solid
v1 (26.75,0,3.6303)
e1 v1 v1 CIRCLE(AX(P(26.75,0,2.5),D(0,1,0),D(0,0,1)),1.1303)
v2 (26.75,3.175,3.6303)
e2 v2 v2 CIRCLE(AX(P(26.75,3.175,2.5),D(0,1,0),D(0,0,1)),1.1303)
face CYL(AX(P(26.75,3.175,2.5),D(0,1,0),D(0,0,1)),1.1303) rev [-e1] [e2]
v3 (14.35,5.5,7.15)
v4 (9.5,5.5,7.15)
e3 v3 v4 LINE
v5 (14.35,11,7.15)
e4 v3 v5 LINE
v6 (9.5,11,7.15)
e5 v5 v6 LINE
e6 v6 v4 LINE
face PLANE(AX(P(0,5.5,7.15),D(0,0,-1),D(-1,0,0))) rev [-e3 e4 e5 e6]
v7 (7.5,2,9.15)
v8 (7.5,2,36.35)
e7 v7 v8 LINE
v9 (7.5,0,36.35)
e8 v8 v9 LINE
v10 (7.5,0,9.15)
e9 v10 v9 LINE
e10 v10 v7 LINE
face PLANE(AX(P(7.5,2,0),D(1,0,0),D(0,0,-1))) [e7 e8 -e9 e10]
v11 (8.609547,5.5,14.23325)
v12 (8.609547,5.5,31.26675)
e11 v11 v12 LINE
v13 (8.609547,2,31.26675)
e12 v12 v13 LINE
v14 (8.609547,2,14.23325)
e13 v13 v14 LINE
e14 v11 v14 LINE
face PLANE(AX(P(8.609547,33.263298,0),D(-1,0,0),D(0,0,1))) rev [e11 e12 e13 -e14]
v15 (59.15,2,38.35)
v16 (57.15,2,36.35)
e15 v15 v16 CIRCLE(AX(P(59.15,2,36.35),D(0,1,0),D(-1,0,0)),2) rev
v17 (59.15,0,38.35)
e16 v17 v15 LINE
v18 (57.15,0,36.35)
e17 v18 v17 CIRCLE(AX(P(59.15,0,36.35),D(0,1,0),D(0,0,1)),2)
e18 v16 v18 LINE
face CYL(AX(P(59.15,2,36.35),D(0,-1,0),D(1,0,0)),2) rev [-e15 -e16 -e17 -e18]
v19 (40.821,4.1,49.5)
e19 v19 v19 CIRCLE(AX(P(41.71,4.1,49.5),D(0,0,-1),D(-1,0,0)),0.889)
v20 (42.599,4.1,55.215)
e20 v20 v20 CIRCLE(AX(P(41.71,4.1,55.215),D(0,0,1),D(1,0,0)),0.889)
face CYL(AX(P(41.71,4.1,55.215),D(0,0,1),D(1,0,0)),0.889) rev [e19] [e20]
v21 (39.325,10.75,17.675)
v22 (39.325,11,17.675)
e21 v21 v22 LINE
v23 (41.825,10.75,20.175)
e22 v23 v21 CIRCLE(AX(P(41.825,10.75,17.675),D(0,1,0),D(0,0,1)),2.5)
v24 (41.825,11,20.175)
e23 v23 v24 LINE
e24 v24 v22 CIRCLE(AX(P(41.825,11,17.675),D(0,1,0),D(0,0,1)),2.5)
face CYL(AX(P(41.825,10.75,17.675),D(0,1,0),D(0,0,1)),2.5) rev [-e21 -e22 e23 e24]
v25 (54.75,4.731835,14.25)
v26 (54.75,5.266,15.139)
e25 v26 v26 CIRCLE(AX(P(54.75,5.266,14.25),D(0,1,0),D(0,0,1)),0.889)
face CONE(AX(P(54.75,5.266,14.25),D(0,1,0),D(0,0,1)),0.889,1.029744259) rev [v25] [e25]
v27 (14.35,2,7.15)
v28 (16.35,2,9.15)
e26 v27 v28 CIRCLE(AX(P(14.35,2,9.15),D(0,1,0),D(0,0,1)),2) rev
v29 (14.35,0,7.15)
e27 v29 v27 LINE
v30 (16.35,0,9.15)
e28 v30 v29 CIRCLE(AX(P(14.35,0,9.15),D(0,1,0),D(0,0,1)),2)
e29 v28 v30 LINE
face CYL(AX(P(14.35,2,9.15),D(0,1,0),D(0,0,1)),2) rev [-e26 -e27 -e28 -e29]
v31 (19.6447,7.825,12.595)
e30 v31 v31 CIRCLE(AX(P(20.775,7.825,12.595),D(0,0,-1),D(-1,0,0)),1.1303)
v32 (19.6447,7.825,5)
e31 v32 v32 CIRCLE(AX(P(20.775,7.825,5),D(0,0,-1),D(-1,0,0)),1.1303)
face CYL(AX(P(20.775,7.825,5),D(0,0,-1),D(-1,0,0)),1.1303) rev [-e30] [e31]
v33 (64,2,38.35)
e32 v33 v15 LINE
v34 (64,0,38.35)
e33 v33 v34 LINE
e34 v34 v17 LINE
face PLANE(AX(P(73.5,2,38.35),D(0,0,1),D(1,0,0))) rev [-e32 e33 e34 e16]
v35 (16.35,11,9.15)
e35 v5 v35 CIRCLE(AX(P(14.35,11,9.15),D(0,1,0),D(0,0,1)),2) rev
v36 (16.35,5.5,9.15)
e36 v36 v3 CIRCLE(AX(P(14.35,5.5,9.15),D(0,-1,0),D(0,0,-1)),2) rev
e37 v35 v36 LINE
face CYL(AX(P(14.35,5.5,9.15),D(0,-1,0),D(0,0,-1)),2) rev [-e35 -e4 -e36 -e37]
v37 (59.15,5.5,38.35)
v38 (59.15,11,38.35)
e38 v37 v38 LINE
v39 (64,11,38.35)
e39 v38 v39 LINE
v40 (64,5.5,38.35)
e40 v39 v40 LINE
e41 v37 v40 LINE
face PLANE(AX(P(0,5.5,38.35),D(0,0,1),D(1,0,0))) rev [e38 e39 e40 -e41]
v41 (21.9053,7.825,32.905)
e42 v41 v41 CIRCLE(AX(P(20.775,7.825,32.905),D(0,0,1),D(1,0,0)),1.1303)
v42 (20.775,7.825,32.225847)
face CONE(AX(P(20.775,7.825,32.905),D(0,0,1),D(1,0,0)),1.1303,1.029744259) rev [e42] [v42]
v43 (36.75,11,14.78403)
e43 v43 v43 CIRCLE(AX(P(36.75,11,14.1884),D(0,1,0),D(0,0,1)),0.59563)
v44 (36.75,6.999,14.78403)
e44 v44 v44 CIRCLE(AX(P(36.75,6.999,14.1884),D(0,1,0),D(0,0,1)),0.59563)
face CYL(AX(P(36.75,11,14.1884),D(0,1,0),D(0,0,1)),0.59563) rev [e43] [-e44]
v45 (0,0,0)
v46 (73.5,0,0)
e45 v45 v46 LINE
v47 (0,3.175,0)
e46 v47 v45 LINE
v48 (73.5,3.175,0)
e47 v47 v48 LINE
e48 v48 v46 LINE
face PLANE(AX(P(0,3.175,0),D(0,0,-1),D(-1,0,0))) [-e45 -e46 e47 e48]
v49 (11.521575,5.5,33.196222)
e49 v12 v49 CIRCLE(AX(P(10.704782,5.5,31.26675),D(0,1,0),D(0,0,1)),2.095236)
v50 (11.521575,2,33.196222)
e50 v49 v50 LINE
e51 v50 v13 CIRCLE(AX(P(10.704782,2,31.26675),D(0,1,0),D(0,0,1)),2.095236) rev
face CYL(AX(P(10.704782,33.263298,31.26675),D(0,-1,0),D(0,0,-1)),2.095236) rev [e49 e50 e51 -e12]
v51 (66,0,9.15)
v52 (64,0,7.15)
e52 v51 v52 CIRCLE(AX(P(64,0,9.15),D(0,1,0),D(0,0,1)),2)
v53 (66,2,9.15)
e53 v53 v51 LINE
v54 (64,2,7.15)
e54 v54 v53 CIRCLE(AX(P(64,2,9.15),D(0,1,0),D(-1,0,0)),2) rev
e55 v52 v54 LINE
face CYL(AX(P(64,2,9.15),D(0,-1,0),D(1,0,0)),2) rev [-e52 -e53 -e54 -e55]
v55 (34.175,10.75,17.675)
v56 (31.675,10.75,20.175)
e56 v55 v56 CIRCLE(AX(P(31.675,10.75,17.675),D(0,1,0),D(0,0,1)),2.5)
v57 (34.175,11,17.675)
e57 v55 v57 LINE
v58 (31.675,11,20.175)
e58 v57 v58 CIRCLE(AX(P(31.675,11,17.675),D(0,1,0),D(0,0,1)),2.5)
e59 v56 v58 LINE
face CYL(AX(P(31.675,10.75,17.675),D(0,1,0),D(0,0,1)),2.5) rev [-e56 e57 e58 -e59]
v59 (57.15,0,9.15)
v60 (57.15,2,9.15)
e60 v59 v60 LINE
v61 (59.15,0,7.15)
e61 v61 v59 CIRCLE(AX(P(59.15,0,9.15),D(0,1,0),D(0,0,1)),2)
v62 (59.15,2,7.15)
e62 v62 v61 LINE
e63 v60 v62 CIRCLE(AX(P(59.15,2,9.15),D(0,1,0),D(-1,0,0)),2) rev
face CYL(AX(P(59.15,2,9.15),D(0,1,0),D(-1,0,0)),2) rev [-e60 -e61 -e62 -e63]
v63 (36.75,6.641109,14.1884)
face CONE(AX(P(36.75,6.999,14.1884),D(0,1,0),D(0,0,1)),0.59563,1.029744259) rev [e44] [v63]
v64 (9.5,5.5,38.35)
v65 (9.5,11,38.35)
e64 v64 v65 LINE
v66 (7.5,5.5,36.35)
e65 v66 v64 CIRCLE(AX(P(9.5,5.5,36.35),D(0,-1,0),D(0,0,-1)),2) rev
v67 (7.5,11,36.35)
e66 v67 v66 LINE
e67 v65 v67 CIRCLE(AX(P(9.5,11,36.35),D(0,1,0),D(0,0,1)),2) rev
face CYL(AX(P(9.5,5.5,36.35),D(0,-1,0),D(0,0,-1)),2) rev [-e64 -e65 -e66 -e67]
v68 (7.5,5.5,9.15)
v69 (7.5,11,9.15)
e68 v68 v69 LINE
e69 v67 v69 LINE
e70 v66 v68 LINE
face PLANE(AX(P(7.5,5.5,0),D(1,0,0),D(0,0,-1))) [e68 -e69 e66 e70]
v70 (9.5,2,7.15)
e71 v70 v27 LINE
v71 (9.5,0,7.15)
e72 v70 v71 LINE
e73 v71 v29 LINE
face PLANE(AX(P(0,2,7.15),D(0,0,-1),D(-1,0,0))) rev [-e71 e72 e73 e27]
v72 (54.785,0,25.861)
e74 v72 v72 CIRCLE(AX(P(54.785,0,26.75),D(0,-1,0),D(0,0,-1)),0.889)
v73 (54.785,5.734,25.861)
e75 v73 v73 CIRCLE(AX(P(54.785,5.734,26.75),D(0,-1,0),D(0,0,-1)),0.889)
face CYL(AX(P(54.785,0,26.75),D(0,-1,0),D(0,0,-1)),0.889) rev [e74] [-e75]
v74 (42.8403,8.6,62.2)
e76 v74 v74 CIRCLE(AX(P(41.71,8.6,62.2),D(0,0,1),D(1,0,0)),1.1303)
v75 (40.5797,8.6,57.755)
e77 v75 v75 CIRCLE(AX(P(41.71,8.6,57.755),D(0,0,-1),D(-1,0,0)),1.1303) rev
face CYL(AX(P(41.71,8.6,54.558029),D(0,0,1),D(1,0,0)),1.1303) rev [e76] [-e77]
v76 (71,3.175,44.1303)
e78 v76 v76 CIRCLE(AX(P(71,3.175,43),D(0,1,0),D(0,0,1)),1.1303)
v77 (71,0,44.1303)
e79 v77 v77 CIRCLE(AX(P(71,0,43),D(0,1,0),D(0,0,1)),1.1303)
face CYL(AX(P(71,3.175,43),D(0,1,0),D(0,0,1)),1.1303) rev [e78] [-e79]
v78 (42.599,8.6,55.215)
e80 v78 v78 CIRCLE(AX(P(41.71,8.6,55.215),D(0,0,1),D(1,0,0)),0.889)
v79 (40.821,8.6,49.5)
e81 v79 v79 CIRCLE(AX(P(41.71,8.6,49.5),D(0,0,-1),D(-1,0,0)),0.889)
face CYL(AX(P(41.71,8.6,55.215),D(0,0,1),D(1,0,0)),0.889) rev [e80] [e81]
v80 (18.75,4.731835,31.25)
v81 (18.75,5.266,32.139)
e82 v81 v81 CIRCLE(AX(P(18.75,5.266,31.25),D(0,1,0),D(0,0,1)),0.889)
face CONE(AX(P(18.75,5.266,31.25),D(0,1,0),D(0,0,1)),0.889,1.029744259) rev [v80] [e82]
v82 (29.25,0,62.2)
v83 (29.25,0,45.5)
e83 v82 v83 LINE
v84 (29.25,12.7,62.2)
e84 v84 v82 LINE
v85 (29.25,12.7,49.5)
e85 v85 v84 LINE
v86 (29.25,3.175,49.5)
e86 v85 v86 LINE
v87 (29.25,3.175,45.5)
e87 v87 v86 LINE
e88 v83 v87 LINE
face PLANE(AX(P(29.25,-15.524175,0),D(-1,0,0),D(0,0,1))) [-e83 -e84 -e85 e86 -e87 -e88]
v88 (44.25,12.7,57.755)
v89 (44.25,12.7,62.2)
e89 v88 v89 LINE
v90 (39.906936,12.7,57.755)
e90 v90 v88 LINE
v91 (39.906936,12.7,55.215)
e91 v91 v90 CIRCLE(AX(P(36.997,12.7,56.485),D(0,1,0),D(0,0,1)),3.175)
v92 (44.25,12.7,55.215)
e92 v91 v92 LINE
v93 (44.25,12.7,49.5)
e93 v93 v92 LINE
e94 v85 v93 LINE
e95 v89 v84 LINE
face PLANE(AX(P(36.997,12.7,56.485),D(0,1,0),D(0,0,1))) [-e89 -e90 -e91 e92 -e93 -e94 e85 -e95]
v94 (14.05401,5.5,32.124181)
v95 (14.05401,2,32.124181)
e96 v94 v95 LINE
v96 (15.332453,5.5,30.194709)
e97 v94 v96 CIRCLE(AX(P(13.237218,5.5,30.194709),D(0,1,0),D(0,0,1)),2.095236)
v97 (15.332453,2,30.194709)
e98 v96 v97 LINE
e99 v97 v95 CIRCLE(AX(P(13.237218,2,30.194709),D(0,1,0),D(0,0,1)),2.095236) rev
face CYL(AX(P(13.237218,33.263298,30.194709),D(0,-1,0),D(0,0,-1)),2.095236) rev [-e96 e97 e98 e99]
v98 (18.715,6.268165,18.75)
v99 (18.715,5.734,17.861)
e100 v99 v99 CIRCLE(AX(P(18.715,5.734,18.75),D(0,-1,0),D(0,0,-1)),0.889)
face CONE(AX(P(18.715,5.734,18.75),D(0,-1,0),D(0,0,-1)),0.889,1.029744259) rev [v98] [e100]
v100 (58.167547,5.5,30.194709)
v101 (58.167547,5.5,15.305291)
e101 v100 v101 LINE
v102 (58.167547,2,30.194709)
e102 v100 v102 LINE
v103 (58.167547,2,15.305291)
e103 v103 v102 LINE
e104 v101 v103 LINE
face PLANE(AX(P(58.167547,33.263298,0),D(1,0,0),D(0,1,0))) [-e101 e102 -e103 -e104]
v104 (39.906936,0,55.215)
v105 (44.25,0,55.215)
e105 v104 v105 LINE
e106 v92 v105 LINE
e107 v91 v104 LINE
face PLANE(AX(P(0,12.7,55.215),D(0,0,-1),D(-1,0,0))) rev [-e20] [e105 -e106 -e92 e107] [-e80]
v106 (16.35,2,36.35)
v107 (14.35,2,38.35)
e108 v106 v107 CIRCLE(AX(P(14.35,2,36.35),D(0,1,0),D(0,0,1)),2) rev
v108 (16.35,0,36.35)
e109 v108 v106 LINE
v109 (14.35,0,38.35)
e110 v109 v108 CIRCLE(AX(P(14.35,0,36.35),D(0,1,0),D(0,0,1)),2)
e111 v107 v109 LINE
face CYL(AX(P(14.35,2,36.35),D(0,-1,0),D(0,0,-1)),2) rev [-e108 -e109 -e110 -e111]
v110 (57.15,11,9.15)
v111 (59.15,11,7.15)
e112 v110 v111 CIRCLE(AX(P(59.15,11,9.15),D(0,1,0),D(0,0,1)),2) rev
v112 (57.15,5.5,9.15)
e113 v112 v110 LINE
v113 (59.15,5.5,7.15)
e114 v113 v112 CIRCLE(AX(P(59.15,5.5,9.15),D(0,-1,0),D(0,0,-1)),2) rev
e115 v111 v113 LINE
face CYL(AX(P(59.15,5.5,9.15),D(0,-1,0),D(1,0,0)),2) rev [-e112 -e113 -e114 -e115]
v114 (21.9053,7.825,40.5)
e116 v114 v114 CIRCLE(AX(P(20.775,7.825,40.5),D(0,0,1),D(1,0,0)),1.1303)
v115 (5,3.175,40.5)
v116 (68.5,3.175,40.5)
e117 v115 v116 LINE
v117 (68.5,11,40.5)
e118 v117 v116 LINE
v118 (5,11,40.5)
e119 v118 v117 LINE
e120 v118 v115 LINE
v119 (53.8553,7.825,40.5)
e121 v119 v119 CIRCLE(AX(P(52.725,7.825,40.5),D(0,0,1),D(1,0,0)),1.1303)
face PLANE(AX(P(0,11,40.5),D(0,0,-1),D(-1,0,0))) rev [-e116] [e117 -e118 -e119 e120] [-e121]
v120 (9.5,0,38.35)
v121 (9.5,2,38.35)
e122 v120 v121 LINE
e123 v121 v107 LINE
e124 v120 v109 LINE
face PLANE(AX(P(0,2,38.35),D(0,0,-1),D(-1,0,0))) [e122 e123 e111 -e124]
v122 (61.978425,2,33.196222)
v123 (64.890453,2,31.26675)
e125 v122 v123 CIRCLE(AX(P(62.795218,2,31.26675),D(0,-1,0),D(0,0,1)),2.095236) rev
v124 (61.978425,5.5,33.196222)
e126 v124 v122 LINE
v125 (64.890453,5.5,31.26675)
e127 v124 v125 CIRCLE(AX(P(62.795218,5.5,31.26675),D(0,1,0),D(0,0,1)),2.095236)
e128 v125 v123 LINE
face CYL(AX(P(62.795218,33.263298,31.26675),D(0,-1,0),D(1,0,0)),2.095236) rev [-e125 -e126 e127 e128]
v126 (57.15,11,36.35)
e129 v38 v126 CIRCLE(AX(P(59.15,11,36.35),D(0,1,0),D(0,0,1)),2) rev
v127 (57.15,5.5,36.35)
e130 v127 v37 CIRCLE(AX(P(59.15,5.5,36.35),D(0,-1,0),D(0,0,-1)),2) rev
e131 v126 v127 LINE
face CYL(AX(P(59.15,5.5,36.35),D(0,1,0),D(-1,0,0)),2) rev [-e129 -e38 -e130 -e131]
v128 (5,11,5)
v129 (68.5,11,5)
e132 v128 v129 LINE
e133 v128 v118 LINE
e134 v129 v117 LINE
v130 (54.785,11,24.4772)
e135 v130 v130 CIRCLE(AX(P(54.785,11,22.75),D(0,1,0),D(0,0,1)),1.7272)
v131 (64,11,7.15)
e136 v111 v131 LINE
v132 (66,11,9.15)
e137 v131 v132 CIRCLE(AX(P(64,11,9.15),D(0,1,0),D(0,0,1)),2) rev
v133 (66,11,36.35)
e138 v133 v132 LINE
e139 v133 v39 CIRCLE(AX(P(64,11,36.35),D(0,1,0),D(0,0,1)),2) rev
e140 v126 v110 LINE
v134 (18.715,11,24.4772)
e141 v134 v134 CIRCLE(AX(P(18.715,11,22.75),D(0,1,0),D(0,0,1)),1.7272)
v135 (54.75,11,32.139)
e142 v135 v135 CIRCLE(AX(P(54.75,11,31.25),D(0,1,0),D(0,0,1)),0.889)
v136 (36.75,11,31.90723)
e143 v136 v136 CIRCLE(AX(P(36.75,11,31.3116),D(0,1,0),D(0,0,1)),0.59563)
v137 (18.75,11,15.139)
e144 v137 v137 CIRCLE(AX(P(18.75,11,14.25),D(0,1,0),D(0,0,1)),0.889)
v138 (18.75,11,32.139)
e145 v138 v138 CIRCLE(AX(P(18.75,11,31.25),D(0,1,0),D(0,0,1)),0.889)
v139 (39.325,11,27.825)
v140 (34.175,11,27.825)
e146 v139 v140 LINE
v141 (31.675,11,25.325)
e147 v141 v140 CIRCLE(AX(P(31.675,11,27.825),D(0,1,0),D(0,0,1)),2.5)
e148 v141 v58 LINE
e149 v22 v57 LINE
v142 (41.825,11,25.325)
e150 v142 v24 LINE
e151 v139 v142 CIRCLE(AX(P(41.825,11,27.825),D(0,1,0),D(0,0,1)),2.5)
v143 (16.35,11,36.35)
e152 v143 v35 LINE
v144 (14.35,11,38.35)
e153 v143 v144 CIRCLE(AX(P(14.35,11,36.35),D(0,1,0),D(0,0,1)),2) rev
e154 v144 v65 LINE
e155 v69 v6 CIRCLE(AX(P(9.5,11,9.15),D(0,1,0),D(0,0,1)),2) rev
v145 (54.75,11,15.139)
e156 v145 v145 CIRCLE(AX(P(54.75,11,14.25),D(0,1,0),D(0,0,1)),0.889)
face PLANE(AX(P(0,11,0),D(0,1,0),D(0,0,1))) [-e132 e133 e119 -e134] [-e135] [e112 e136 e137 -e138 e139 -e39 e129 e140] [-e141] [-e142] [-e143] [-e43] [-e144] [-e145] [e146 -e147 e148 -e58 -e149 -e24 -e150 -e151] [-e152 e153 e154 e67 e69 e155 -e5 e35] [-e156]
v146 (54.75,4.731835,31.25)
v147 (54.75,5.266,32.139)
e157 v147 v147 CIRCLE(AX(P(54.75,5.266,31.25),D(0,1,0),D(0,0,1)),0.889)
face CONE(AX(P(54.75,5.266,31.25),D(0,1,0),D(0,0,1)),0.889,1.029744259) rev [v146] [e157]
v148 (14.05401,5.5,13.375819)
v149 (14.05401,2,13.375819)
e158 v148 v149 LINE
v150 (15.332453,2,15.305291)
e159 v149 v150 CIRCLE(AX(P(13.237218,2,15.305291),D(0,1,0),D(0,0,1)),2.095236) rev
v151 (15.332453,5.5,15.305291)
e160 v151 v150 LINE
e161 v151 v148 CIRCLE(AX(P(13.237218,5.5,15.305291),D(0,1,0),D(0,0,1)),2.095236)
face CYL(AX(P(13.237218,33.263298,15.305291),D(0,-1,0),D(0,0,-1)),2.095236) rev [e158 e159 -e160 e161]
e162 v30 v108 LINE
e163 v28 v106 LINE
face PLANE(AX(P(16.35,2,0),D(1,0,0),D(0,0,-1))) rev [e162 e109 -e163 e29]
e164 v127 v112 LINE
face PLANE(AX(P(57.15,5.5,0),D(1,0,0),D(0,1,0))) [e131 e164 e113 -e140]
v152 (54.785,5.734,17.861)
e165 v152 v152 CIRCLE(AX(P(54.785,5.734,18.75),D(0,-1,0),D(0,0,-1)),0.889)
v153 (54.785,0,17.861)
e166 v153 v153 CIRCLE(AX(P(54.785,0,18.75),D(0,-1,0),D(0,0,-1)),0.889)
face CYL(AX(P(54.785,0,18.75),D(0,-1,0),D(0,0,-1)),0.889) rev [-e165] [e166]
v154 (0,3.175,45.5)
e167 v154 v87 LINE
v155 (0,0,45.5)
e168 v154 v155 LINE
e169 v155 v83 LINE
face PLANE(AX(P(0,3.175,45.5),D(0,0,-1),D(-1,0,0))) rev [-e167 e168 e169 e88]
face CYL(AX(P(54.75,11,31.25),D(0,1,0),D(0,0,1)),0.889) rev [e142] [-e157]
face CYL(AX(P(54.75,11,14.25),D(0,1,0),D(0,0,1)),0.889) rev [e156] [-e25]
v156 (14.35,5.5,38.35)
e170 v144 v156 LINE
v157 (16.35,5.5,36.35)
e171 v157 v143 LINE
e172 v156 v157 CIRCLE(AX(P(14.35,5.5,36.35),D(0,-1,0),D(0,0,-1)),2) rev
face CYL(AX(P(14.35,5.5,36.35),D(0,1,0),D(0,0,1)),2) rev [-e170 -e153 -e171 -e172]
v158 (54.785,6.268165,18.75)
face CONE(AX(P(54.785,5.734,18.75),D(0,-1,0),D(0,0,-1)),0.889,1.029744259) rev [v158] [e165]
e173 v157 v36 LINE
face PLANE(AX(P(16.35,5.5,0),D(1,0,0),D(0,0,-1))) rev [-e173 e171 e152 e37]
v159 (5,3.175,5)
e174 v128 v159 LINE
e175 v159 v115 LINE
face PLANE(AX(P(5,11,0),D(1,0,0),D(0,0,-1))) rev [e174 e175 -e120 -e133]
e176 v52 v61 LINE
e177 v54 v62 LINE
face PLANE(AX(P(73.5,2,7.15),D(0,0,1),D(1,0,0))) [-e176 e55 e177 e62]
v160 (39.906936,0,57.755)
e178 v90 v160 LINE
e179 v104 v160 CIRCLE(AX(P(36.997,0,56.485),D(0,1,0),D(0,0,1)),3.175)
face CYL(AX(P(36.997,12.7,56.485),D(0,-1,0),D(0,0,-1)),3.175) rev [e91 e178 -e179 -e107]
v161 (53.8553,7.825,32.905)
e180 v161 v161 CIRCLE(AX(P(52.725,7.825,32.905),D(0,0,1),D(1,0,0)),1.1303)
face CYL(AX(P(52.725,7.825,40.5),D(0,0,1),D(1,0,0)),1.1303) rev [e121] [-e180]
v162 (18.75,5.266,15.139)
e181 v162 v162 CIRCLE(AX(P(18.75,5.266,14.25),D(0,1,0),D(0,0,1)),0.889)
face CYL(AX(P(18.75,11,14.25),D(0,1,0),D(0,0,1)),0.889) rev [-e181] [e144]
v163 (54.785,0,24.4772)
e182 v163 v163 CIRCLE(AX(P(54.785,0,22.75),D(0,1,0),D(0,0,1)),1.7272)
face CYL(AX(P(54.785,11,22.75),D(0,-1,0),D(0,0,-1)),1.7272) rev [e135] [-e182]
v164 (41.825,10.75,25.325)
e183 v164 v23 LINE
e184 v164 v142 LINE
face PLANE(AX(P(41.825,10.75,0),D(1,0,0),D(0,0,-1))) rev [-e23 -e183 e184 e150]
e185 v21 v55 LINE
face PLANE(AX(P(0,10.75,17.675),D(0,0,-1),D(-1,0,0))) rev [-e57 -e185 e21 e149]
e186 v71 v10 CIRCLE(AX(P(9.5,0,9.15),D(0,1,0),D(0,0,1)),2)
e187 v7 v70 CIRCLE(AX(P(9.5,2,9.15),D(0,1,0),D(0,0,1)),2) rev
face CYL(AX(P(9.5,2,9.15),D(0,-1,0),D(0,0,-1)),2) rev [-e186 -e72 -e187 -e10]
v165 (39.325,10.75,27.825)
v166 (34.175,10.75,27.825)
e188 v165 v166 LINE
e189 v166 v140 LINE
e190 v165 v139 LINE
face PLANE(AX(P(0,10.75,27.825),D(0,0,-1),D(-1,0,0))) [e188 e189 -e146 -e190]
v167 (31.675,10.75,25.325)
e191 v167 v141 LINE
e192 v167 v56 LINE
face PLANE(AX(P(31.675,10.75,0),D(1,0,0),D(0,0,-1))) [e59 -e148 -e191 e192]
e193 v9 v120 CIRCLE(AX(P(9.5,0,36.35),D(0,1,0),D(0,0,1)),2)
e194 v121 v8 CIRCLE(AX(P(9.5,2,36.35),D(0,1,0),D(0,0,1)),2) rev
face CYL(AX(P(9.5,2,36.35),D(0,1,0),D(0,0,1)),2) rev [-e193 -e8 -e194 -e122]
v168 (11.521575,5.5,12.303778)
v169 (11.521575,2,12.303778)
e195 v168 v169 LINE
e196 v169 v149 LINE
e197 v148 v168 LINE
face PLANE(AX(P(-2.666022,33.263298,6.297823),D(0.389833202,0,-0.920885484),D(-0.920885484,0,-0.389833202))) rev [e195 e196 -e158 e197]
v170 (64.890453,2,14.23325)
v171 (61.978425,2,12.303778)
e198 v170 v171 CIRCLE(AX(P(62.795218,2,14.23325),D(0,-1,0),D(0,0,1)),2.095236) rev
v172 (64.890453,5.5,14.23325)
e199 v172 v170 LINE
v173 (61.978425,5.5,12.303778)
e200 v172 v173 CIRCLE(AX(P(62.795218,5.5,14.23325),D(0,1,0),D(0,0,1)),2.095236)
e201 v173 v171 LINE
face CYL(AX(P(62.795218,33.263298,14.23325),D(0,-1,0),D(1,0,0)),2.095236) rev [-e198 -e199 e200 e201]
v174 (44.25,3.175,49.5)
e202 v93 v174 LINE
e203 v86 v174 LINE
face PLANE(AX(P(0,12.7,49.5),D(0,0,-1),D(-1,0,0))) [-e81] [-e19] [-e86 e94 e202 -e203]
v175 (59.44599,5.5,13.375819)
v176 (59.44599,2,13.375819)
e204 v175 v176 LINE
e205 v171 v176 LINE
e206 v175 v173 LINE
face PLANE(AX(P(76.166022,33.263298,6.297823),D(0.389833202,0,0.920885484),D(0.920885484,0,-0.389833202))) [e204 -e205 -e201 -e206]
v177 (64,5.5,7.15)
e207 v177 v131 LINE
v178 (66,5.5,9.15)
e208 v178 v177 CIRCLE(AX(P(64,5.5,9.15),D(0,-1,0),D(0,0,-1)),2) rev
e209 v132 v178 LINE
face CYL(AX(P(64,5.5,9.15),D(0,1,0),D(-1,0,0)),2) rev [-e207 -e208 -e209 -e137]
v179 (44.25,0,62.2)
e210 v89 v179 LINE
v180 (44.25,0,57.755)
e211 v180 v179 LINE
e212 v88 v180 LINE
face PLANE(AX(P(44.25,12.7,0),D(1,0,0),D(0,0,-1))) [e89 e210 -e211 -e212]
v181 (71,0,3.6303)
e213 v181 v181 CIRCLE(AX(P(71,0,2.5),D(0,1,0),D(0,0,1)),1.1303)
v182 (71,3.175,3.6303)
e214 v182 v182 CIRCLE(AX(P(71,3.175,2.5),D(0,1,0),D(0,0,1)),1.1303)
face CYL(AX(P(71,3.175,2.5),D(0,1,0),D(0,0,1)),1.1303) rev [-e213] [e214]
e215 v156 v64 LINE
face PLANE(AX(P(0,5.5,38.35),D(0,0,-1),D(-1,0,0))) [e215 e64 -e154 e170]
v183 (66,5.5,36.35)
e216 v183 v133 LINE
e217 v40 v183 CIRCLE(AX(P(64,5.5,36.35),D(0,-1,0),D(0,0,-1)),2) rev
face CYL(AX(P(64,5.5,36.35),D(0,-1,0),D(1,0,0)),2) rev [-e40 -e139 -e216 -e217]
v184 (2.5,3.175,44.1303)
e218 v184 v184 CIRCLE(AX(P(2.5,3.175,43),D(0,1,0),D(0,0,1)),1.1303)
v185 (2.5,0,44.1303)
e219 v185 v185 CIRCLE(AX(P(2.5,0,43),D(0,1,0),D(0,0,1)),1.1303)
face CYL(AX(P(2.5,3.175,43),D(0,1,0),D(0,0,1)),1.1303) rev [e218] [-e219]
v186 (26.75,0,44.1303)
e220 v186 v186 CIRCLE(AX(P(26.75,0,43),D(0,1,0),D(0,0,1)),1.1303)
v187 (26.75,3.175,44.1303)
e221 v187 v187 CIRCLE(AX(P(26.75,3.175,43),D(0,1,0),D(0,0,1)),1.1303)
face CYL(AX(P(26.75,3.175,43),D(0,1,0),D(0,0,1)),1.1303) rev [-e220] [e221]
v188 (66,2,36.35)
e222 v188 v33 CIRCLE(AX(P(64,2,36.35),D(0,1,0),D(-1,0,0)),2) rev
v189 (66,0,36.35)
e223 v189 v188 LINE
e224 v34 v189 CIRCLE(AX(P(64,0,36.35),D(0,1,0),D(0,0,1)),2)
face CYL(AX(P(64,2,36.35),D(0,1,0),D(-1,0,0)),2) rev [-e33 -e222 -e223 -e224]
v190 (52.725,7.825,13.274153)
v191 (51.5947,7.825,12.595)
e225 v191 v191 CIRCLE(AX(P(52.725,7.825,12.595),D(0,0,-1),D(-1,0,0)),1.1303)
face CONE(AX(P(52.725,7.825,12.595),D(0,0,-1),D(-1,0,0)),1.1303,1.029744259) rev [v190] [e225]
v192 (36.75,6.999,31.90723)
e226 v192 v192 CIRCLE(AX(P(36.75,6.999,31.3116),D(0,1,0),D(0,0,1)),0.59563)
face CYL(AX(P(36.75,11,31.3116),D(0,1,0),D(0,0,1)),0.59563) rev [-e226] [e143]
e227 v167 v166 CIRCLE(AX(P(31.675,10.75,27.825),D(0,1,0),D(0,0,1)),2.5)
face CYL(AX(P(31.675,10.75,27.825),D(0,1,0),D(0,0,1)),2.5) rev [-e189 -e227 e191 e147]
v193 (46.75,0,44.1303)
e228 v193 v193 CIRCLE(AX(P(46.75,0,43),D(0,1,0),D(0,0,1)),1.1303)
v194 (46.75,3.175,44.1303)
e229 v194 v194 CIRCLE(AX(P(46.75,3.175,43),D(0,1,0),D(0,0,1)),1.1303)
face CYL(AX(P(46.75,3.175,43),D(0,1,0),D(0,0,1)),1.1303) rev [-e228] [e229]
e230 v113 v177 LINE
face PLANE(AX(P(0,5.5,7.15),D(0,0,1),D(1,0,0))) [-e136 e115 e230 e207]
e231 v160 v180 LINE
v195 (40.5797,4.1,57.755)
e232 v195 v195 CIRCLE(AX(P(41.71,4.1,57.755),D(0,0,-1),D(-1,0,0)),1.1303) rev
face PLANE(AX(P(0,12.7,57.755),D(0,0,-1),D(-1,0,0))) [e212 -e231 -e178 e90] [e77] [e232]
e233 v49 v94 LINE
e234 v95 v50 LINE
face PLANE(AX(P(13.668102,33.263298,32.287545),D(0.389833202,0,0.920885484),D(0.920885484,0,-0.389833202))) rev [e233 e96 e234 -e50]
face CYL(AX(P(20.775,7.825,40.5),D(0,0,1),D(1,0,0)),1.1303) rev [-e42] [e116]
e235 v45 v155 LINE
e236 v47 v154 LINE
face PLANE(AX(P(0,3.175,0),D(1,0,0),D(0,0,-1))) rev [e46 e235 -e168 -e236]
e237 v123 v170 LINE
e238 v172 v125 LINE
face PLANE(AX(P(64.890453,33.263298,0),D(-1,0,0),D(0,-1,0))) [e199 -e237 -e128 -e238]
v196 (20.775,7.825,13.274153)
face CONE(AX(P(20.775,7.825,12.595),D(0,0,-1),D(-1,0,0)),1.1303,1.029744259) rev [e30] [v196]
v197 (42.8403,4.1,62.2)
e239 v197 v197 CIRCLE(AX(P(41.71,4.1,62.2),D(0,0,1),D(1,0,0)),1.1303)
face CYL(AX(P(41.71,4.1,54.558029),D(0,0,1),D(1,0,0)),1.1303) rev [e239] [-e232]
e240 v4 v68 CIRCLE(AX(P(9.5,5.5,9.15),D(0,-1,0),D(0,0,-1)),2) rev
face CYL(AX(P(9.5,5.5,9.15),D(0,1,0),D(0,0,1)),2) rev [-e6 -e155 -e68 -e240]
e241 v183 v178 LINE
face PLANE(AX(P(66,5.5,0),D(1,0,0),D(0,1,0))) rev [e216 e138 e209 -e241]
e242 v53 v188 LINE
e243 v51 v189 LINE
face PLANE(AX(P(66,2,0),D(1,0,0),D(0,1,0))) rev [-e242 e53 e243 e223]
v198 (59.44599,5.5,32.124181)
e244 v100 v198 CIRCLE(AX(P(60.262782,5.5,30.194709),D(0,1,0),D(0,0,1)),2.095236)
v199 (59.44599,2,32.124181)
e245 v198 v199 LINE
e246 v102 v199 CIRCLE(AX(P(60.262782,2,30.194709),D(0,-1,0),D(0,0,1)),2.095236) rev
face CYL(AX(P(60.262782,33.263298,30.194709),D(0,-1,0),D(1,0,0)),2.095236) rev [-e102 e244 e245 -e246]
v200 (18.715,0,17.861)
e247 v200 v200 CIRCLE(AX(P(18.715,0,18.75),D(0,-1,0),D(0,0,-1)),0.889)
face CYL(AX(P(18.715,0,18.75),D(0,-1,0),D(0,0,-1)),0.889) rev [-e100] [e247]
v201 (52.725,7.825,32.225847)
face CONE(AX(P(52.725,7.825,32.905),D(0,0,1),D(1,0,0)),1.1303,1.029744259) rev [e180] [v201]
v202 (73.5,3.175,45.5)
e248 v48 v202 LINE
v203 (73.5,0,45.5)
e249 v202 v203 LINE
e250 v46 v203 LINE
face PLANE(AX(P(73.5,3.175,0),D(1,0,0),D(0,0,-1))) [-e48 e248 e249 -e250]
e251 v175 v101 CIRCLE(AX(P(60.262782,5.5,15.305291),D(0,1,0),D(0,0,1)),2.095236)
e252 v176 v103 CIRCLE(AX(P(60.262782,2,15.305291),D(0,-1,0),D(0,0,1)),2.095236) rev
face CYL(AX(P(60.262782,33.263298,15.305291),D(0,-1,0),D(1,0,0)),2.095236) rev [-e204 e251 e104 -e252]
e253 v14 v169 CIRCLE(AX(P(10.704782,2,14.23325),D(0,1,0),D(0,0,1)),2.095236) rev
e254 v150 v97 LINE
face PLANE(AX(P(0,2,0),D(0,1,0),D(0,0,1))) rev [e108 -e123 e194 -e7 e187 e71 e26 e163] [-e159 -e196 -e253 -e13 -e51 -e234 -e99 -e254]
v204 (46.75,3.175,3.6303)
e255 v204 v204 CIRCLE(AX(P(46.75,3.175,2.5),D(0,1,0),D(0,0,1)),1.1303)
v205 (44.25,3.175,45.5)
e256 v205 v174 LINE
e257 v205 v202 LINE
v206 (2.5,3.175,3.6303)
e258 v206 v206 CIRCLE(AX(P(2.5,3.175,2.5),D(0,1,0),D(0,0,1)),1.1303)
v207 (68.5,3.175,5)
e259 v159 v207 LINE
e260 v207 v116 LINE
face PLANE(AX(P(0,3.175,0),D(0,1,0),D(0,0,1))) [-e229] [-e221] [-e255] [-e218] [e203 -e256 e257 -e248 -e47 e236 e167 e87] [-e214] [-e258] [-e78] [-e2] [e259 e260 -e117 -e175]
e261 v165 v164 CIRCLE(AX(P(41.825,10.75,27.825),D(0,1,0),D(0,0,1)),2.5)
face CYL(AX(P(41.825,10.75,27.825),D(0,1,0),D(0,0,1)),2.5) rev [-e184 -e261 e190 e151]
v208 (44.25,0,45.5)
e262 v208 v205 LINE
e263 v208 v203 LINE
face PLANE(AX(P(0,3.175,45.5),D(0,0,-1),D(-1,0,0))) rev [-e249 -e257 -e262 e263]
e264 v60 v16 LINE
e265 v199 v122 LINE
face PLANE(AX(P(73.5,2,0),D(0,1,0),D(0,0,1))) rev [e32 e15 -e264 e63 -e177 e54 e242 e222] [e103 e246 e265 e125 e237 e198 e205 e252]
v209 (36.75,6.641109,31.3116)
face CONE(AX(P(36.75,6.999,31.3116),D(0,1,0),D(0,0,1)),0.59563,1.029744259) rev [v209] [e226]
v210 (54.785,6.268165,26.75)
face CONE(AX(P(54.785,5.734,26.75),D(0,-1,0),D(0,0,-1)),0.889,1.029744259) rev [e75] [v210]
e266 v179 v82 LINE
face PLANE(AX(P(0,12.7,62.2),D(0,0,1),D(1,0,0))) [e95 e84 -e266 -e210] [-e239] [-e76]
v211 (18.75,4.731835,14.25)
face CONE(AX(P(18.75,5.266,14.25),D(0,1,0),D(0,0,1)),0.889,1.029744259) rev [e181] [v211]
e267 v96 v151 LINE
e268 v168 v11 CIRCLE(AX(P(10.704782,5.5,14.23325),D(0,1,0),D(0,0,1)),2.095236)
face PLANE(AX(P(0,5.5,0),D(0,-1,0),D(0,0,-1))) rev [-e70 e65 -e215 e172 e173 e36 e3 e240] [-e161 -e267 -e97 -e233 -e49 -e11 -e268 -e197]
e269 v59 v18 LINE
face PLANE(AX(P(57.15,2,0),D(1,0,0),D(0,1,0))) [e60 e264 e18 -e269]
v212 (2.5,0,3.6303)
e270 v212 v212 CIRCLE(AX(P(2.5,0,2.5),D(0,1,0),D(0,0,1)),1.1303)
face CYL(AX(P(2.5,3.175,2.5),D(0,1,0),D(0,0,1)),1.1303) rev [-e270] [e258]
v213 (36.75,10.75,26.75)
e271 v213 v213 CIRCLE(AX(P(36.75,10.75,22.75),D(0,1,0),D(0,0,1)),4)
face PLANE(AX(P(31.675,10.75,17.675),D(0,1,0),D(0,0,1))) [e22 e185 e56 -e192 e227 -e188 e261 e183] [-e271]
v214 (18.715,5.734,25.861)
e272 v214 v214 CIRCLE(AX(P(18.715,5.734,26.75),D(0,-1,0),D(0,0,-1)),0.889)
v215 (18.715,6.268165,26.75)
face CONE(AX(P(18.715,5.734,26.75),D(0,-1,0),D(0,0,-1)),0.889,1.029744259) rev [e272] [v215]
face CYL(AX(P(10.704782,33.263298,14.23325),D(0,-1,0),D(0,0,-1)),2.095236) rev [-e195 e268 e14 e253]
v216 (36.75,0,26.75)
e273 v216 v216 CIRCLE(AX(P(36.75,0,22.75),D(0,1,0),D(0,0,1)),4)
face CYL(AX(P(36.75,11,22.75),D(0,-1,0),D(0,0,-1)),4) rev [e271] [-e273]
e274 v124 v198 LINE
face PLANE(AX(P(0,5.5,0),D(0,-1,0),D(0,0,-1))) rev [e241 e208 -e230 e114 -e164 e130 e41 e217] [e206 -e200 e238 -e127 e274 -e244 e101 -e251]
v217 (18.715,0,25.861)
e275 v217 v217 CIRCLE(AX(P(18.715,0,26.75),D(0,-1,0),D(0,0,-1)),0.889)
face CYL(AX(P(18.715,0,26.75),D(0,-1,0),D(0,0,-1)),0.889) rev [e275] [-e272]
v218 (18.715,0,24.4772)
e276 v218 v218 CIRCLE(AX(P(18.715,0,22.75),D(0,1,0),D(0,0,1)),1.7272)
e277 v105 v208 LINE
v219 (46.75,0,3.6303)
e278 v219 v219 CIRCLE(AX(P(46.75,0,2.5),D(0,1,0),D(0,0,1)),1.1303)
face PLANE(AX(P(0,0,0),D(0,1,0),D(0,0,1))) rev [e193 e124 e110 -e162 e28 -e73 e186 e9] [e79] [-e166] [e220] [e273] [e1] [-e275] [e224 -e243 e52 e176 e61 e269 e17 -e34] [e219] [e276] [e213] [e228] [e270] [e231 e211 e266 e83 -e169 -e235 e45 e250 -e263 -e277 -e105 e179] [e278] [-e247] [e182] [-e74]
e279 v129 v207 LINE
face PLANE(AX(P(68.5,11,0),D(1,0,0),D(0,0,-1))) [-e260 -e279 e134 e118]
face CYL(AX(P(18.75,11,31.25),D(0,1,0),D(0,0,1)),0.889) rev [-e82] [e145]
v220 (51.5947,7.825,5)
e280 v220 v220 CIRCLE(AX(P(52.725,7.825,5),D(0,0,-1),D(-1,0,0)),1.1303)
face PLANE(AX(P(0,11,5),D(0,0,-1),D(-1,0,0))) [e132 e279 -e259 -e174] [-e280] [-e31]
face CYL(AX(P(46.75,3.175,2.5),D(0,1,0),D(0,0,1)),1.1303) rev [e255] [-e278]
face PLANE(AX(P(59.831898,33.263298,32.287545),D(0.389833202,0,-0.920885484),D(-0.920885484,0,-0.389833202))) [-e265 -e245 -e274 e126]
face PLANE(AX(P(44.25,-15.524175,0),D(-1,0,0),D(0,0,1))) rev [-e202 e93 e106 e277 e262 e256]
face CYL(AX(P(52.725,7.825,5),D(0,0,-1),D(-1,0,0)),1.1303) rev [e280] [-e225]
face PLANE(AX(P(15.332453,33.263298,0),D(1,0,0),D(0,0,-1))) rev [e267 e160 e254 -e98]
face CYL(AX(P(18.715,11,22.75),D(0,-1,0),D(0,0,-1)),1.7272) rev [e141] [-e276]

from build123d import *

# Parameters (mm, degrees)
MAIN_SKETCH_W                           = 73.5
MAIN_SKETCH_H                           = 45.5
MAIN_SKETCH_W_2                         = 63.5
MAIN_SKETCH_H_2                         = 35.5
LIP_DEPTH                               = 3.175
MOUNTING_BASE_OUTLINE_W                 = 63.5
MOUNTING_BASE_OUTLINE_H                 = 35.5
MOUNTING_BASE_OUTLINE_R                 = 1.7272
MOUNTING_BASE_OUTLINE_R_2               = 4
MOUNTING_BASE_DEPTH                     = 11
HEATER_CART_4_40_TAPS_D                 = 2.2606
HEATER_CART_4_40_TAPS_DEPTH             = 7.595
HEATER_CART_4_40_TAPS_TIP               = 0.679152758
HEATER_CART_4_40_TAPS_ON_FACE_2_D       = 2.2606
HEATER_CART_4_40_TAPS_ON_FACE_2_DEPTH   = 7.595
HEATER_CART_4_40_TAPS_ON_FACE_2_TIP     = 0.679152758
MAIN_SKETCH_12_W                        = 8.85
MAIN_SKETCH_12_H                        = 31.2
BOTTOM_SQUARE_CUTOUT_DEPTH              = 2
SQUARE_MICRO_D_CUTOUT_START             = 5.5
SQUARE_MICRO_D_CUTOUT_OUTLINE_W         = 8.85
SQUARE_MICRO_D_CUTOUT_OUTLINE_H         = 31.2
SQUARE_MICRO_D_CUTOUT_DEPTH             = 5.5
MAIN_SKETCH_7_R                         = 0.285
ROUND_MICRO_D_CUTOUT_DEPTH              = 11
INTERNAL_CORNER_CUTOUTS_FILLET_R        = 2
CHIP_CLAMP_0_80_TAPS_AT_2_COUNT         = 2
CHIP_CLAMP_0_80_TAPS_AT_2_PITCH         = 17.1232
CHIP_CLAMP_0_80_TAPS_AT_3_COUNT         = 2
CHIP_CLAMP_0_80_TAPS_AT_3_PITCH         = 17.1232
CHIP_POCKET_START                       = 11
MAIN_SKETCH_6_R                         = 2.5
MAIN_SKETCH_6_W                         = 10.15
MAIN_SKETCH_6_H                         = 10.15
CHIP_POCKET_DEPTH                       = 0.25
F_2_56_CLOSE_CLEAR_43_0_089_D           = 2.2606
F_2_56_CLOSE_CLEAR_43_0_089_ON_FACE_2_D = 2.2606
PCB_2_56_TAPS_D                         = 1.778
PCB_2_56_TAPS_DEPTH                     = 5.734
PCB_2_56_TAPS_TIP                       = 0.53416509
BOTTOM_COVER_2_56_TAPS_D                = 1.778
BOTTOM_COVER_2_56_TAPS_DEPTH            = 5.734
BOTTOM_COVER_2_56_TAPS_TIP              = 0.53416509
C_CLAMP_SKETCH_W                        = 15
C_CLAMP_SKETCH_H                        = 4
CCLAMP_BRIDGE_DEPTH                     = 3.175
C_CLAMP_START                           = -3.175
C_CLAMP_DEPTH                           = 12.7
C_CLAMP_HOLE_LOCS_R                     = 1.1303
F_2_56_CLSOE_FIT_THRU_DEPTH             = 4.445
F_2_56_TAPPED_HOLE2_D                   = 1.778
F_2_56_TAPPED_HOLE2_DEPTH               = 14.715


# Read off the part's stored shape, not the designer's step: Mounting_Base, Square_Micro_D_Cutout
with BuildPart() as part:
    # Main_Sketch → Lip (new body)
    with BuildSketch(Plane(origin=(0, 0, 0), x_dir=(1, 0, 0), z_dir=(0, 1, 0))):
        with Locations((36.75, -22.75)):
            Rectangle(MAIN_SKETCH_W, MAIN_SKETCH_H)
        with Locations((36.75, -22.75)):
            Rectangle(MAIN_SKETCH_W_2, MAIN_SKETCH_H_2, mode=Mode.SUBTRACT)
    extrude(amount=LIP_DEPTH)

    # Mounting_Base outline → Mounting_Base (add)
    with BuildSketch(Plane(origin=(0, 0, 0), x_dir=(1, 0, 0), z_dir=(0, 1, 0))):
        with Locations((36.75, -22.75)):
            Rectangle(MOUNTING_BASE_OUTLINE_W, MOUNTING_BASE_OUTLINE_H)
        with Locations((18.715, -22.75)):
            Circle(MOUNTING_BASE_OUTLINE_R, mode=Mode.SUBTRACT)
        with Locations((36.75, -22.75)):
            Circle(MOUNTING_BASE_OUTLINE_R_2, mode=Mode.SUBTRACT)
        with Locations((54.785, -22.75)):
            Circle(MOUNTING_BASE_OUTLINE_R, mode=Mode.SUBTRACT)
    extrude(amount=MOUNTING_BASE_DEPTH)

    # Heater_Cart_#4-40_Taps
    with Locations(Plane(origin=(52.725, 7.825, 5), x_dir=(-1, 0, 0), z_dir=(0, 0, -1))):
        with Locations((0, 0), (31.95, 0)):
            Hole(HEATER_CART_4_40_TAPS_D / 2, depth=HEATER_CART_4_40_TAPS_DEPTH)
            with Locations((0, 0, -(HEATER_CART_4_40_TAPS_DEPTH + HEATER_CART_4_40_TAPS_TIP / 2))):  # 118° drill point
                Cone(0, HEATER_CART_4_40_TAPS_D / 2, HEATER_CART_4_40_TAPS_TIP, mode=Mode.SUBTRACT)

    # Heater_Cart_#4-40_Taps on face 2
    with Locations(Plane(origin=(20.775, 7.825, 40.5), x_dir=(1, 0, 0), z_dir=(0, 0, 1))):
        with Locations((0, 0), (31.95, 0)):
            Hole(HEATER_CART_4_40_TAPS_ON_FACE_2_D / 2, depth=HEATER_CART_4_40_TAPS_ON_FACE_2_DEPTH)
            with Locations((0, 0, -(HEATER_CART_4_40_TAPS_ON_FACE_2_DEPTH + HEATER_CART_4_40_TAPS_ON_FACE_2_TIP / 2))):  # 118° drill point
                Cone(0, HEATER_CART_4_40_TAPS_ON_FACE_2_D / 2, HEATER_CART_4_40_TAPS_ON_FACE_2_TIP, mode=Mode.SUBTRACT)

    # Main_Sketch<12> → Bottom_square_cutout (cut)
    with BuildSketch(Plane(origin=(0, 0, 0), x_dir=(1, 0, 0), z_dir=(0, 1, 0))):
        with Locations((11.925, -22.75)):
            Rectangle(MAIN_SKETCH_12_W, MAIN_SKETCH_12_H)
        with BuildLine():
            ThreePointArc((11.521574965, -33.196222286), (10.496212222, -33.351578951), (9.521946869, -32.996175702))
            ThreePointArc((9.521946869, -32.996175702), (8.851632057, -32.244424217), (8.609546604, -31.26675))
            Line((8.609546604, -31.26675), (8.609546604, -14.23325))
            ThreePointArc((8.609546604, -14.23325), (8.851632057, -13.255575783), (9.521946869, -12.503824298))
            ThreePointArc((9.521946869, -12.503824298), (10.496212222, -12.148421049), (11.521574965, -12.303777714))
            Line((11.521574965, -12.303777714), (14.054010046, -13.37581902))
            ThreePointArc((14.054010046, -13.37581902), (14.983840891, -14.148001292), (15.3324534, -15.305291306))
            Line((15.3324534, -15.305291306), (15.3324534, -30.194708694))
            ThreePointArc((15.3324534, -30.194708694), (14.983840891, -31.351998708), (14.054010046, -32.12418098))
            Line((14.054010046, -32.12418098), (11.521574965, -33.196222286))
        make_face(mode=Mode.SUBTRACT)
    bottom_square_cutout = extrude(amount=BOTTOM_SQUARE_CUTOUT_DEPTH, mode=Mode.SUBTRACT)

    # Square_Micro_D_Cutout outline → Square_Micro_D_Cutout (cut)
    with BuildSketch(Plane(origin=(0, 0, 0), x_dir=(1, 0, 0), z_dir=(0, 1, 0)).offset(SQUARE_MICRO_D_CUTOUT_START)):
        with Locations((11.925, -22.75)):
            Rectangle(SQUARE_MICRO_D_CUTOUT_OUTLINE_W, SQUARE_MICRO_D_CUTOUT_OUTLINE_H)
        with BuildLine():
            ThreePointArc((11.521574965, -33.196222286), (9.547492447, -33.013373348), (8.609546604, -31.26675))
            Line((8.609546604, -31.26675), (8.609546604, -14.23325))
            ThreePointArc((8.609546604, -14.23325), (9.547492447, -12.486626652), (11.521574965, -12.303777714))
            Line((11.521574965, -12.303777714), (14.054010046, -13.37581902))
            ThreePointArc((14.054010046, -13.37581902), (14.983840891, -14.148001291), (15.3324534, -15.305291306))
            Line((15.3324534, -15.305291306), (15.3324534, -30.194708694))
            ThreePointArc((15.3324534, -30.194708694), (14.983840891, -31.351998709), (14.054010046, -32.12418098))
            Line((14.054010046, -32.12418098), (11.521574965, -33.196222286))
        make_face(mode=Mode.SUBTRACT)
    square_micro_d_cutout = extrude(amount=SQUARE_MICRO_D_CUTOUT_DEPTH, mode=Mode.SUBTRACT)

    # Main_Sketch<7> → Round_Micro_D_Cutout (cut)
    # profile 1 of 2: a face of its own
    with BuildSketch(Plane(origin=(0, 0, 0), x_dir=(1, 0, 0), z_dir=(0, 1, 0))):
        with BuildLine():
            ThreePointArc((9.521946869, -32.996175702), (8.851632057, -32.244424217), (8.609546604, -31.26675))
            Line((8.609546604, -31.26675), (8.609546604, -14.23325))
            ThreePointArc((8.609546604, -14.23325), (8.851632057, -13.255575783), (9.521946869, -12.503824298))
            ThreePointArc((9.521946869, -12.503824298), (10.496212222, -12.148421049), (11.521574965, -12.303777714))
            Line((11.521574965, -12.303777714), (14.054010046, -13.37581902))
            ThreePointArc((14.054010046, -13.37581902), (14.983840891, -14.148001292), (15.3324534, -15.305291306))
            Line((15.3324534, -15.305291306), (15.3324534, -30.194708694))
            ThreePointArc((15.3324534, -30.194708694), (14.983840891, -31.351998708), (14.054010046, -32.12418098))
            Line((14.054010046, -32.12418098), (11.521574965, -33.196222286))
            ThreePointArc((11.521574965, -33.196222286), (10.496212222, -33.351578951), (9.521946869, -32.996175702))
        make_face()
        with Locations((11.399546604, -22.75)):
            Circle(MAIN_SKETCH_7_R, mode=Mode.SUBTRACT)
    # profile 2 of 2: a face of its own
    with BuildSketch(Plane(origin=(0, 0, 0), x_dir=(1, 0, 0), z_dir=(0, 1, 0))):
        with Locations((11.399546604, -22.75)):
            Circle(MAIN_SKETCH_7_R)
    round_micro_d_cutout = extrude(amount=ROUND_MICRO_D_CUTOUT_DEPTH, mode=Mode.SUBTRACT)

    # MicroD_Mirror: Bottom_square_cutout, Square_Micro_D_Cutout, Round_Micro_D_Cutout across plane
    add(bottom_square_cutout.mirror(Plane(origin=(36.75, 0, 0), x_dir=(0, 0, 1), z_dir=(1, 0, 0))), mode=Mode.SUBTRACT)
    add(square_micro_d_cutout.mirror(Plane(origin=(36.75, 0, 0), x_dir=(0, 0, 1), z_dir=(1, 0, 0))), mode=Mode.SUBTRACT)
    add(round_micro_d_cutout.mirror(Plane(origin=(36.75, 0, 0), x_dir=(0, 0, 1), z_dir=(1, 0, 0))), mode=Mode.SUBTRACT)

    # Internal_Corner_cutouts_fillet
    internal_corner_cutouts_fillet_edges = [part.edges().sort_by_distance(p)[0] for p in [
        (16.35, 8.25, 38.35),
        (7.5, 8.25, 38.35),
        (7.5, 8.25, 7.15),
        (16.35, 8.25, 7.15),
        (57.15, 1, 7.15),
        (57.15, 1, 38.35),
        (66, 1, 38.35),
        (66, 1, 7.15),
        (66, 8.25, 7.15),
        (66, 8.25, 38.35),
        (57.15, 8.25, 38.35),
        (57.15, 8.25, 7.15),
        (16.35, 1, 38.35),
        (16.35, 1, 7.15),
        (7.5, 1, 7.15),
        (7.5, 1, 38.35),
    ]]
    fillet(internal_corner_cutouts_fillet_edges, radius=INTERNAL_CORNER_CUTOUTS_FILLET_R)

    # Sketch3 → Chip_Clamp_#0-80 Taps (revolve, cut)
    with BuildSketch(Plane(origin=(36.75, 11, 31.3116), x_dir=(0, 0, 1), z_dir=(1, 0, 0))):
        Polygon((0, 0), (0, 4.358890611), (0.59563, 4.001), (0.59563, 0), align=None)
    chip_clamp_0_80_taps = revolve(axis=Axis((36.75, 17.35, 31.3116), (0, -1, 0)), mode=Mode.SUBTRACT)

    # Chip_Clamp_#0-80 Taps at 2: Chip_Clamp_#0-80 Taps ×2
    with Locations(*[(0, 0, -i * CHIP_CLAMP_0_80_TAPS_AT_2_PITCH) for i in range(1, CHIP_CLAMP_0_80_TAPS_AT_2_COUNT)]):
        add(chip_clamp_0_80_taps, mode=Mode.SUBTRACT)

    # Chip_Clamp_#0-80 Taps at 3: Chip_Clamp_#0-80 Taps ×2
    with Locations(*[(0, 0, -i * CHIP_CLAMP_0_80_TAPS_AT_3_PITCH) for i in range(1, CHIP_CLAMP_0_80_TAPS_AT_3_COUNT)]):
        add(chip_clamp_0_80_taps, mode=Mode.SUBTRACT)

    # Main_Sketch<6> → Chip_Pocket (cut)
    with BuildSketch(Plane(origin=(0, 0, 0), x_dir=(1, 0, 0), z_dir=(0, 1, 0)).offset(CHIP_POCKET_START)):
        with BuildLine():
            Line((31.675, -20.175), (31.675, -17.675))
            Line((31.675, -17.675), (34.175, -17.675))
            ThreePointArc((34.175, -17.675), (29.907233047, -15.907233047), (31.675, -20.175))
        make_face()
        with BuildLine():
            Line((34.175, -17.675), (31.675, -17.675))
            Line((31.675, -17.675), (31.675, -20.175))
            ThreePointArc((31.675, -20.175), (33.442766953, -19.442766953), (34.175, -17.675))
        make_face()
        with BuildLine():
            ThreePointArc((44.325, -17.675), (41.825, -15.175), (39.325, -17.675))
            Line((39.325, -17.675), (41.825, -17.675))
            Line((41.825, -17.675), (41.825, -20.175))
            ThreePointArc((41.825, -20.175), (43.592766953, -19.442766953), (44.325, -17.675))
        make_face()
        with BuildLine():
            Line((41.825, -17.675), (39.325, -17.675))
            ThreePointArc((39.325, -17.675), (40.057233047, -19.442766953), (41.825, -20.175))
            Line((41.825, -20.175), (41.825, -17.675))
        make_face()
        with BuildLine():
            ThreePointArc((34.175, -27.825), (33.442766953, -26.057233047), (31.675, -25.325))
            Line((31.675, -25.325), (31.675, -27.825))
            Line((31.675, -27.825), (34.175, -27.825))
        make_face()
        with BuildLine():
            Line((31.675, -27.825), (31.675, -25.325))
            ThreePointArc((31.675, -25.325), (29.907233047, -29.592766953), (34.175, -27.825))
            Line((34.175, -27.825), (31.675, -27.825))
        make_face()
        with BuildLine():
            ThreePointArc((44.325, -27.825), (43.592766953, -26.057233047), (41.825, -25.325))
            Line((41.825, -25.325), (41.825, -27.825))
            Line((41.825, -27.825), (39.325, -27.825))
            ThreePointArc((39.325, -27.825), (41.825, -30.325), (44.325, -27.825))
        make_face()
        with BuildLine():
            Line((41.825, -27.825), (41.825, -25.325))
            ThreePointArc((41.825, -25.325), (40.057233047, -26.057233047), (39.325, -27.825))
            Line((39.325, -27.825), (41.825, -27.825))
        make_face()
        with Locations((41.825, -27.825)):
            Circle(MAIN_SKETCH_6_R)
        with Locations((41.825, -17.675)):
            Circle(MAIN_SKETCH_6_R)
        with Locations((31.675, -17.675)):
            Circle(MAIN_SKETCH_6_R)
        with Locations((31.675, -27.825)):
            Circle(MAIN_SKETCH_6_R)
        with Locations((36.75, -22.75)):
            Rectangle(MAIN_SKETCH_6_W, MAIN_SKETCH_6_H)
    extrude(amount=-CHIP_POCKET_DEPTH, mode=Mode.SUBTRACT)

    # 2-56_Close_Clear#43 (0.089) (through all)
    with Locations(Plane(origin=(2.5, 3.175, 2.5), x_dir=(0, 0, 1), z_dir=(0, 1, 0))):
        with Locations((0, 0), (40.5, 24.25), (0, 68.5), (0, 44.25), (40.5, 68.5), (40.5, 44.25), (40.5, 0), (0, 24.25)):
            Hole(F_2_56_CLOSE_CLEAR_43_0_089_D / 2)

    # 2-56_Close_Clear#43 (0.089) on face 2 (through all)
    with Locations(Plane(origin=(26.75, 0, 43), x_dir=(0, 0, -1), z_dir=(0, -1, 0))):
        with Locations((0, 0), (40.5, 44.25), (40.5, 20), (0, 44.25), (0, 20), (0, -24.25), (40.5, 0)):
            Hole(F_2_56_CLOSE_CLEAR_43_0_089_ON_FACE_2_D / 2)

    # PCB #2-56 Taps
    with Locations(Plane(origin=(18.75, 11, 14.25), x_dir=(0, 0, 1), z_dir=(0, 1, 0))):
        with Locations((0, 0), (17, 0), (0, 36), (17, 36)):
            Hole(PCB_2_56_TAPS_D / 2, depth=PCB_2_56_TAPS_DEPTH)
            with Locations((0, 0, -(PCB_2_56_TAPS_DEPTH + PCB_2_56_TAPS_TIP / 2))):  # 118° drill point
                Cone(0, PCB_2_56_TAPS_D / 2, PCB_2_56_TAPS_TIP, mode=Mode.SUBTRACT)

    # Bottom_Cover#2-56 Taps
    with Locations(Plane(origin=(54.785, 0, 18.75), x_dir=(0, 0, -1), z_dir=(0, -1, 0))):
        with Locations((0, 0), (-8, 0), (-8, -36.07), (0, -36.07)):
            Hole(BOTTOM_COVER_2_56_TAPS_D / 2, depth=BOTTOM_COVER_2_56_TAPS_DEPTH)
            with Locations((0, 0, -(BOTTOM_COVER_2_56_TAPS_DEPTH + BOTTOM_COVER_2_56_TAPS_TIP / 2))):  # 118° drill point
                Cone(0, BOTTOM_COVER_2_56_TAPS_D / 2, BOTTOM_COVER_2_56_TAPS_TIP, mode=Mode.SUBTRACT)

    # c_clamp_sketch → cclamp_bridge (add)
    with BuildSketch(Plane(origin=(0, 3.175, 0), x_dir=(1, 0, 0), z_dir=(0, 1, 0))):
        with Locations((36.75, -47.5)):
            Rectangle(C_CLAMP_SKETCH_W, C_CLAMP_SKETCH_H)
    extrude(amount=-CCLAMP_BRIDGE_DEPTH)

    # c_clamp_sketch<4> → c_clamp (add)
    with BuildSketch(Plane(origin=(0, 3.175, 0), x_dir=(1, 0, 0), z_dir=(0, 1, 0)).offset(C_CLAMP_START)):
        with BuildLine():
            Line((44.25, -55.215), (44.25, -49.5))
            Line((44.25, -49.5), (29.25, -49.5))
            Line((29.25, -49.5), (29.25, -62.2))
            Line((29.25, -62.2), (44.25, -62.2))
            Line((44.25, -62.2), (44.25, -57.755))
            Line((44.25, -57.755), (39.906935566, -57.755))
            ThreePointArc((39.906935566, -57.755), (33.822, -56.485), (39.906935566, -55.215))
            Line((39.906935566, -55.215), (44.25, -55.215))
        make_face()
    extrude(amount=C_CLAMP_DEPTH)

    # c_clamp_hole_locs → 2-56_clsoe_fit_thru (cut)
    with BuildSketch(Plane.XY.offset(62.2)):
        with Locations((41.71, 8.6)):
            Circle(C_CLAMP_HOLE_LOCS_R)
        with Locations((41.71, 4.1)):
            Circle(C_CLAMP_HOLE_LOCS_R)
    extrude(amount=-F_2_56_CLSOE_FIT_THRU_DEPTH, mode=Mode.SUBTRACT)

    # #2-56 Tapped Hole2
    with Locations(Plane(origin=(41.71, 8.6, 55.215), x_dir=(1, 0, 0), z_dir=(0, 0, 1))):
        with Locations((0, 0), (0, -4.5)):
            Hole(F_2_56_TAPPED_HOLE2_D / 2, depth=F_2_56_TAPPED_HOLE2_DEPTH)


solid = part.part
